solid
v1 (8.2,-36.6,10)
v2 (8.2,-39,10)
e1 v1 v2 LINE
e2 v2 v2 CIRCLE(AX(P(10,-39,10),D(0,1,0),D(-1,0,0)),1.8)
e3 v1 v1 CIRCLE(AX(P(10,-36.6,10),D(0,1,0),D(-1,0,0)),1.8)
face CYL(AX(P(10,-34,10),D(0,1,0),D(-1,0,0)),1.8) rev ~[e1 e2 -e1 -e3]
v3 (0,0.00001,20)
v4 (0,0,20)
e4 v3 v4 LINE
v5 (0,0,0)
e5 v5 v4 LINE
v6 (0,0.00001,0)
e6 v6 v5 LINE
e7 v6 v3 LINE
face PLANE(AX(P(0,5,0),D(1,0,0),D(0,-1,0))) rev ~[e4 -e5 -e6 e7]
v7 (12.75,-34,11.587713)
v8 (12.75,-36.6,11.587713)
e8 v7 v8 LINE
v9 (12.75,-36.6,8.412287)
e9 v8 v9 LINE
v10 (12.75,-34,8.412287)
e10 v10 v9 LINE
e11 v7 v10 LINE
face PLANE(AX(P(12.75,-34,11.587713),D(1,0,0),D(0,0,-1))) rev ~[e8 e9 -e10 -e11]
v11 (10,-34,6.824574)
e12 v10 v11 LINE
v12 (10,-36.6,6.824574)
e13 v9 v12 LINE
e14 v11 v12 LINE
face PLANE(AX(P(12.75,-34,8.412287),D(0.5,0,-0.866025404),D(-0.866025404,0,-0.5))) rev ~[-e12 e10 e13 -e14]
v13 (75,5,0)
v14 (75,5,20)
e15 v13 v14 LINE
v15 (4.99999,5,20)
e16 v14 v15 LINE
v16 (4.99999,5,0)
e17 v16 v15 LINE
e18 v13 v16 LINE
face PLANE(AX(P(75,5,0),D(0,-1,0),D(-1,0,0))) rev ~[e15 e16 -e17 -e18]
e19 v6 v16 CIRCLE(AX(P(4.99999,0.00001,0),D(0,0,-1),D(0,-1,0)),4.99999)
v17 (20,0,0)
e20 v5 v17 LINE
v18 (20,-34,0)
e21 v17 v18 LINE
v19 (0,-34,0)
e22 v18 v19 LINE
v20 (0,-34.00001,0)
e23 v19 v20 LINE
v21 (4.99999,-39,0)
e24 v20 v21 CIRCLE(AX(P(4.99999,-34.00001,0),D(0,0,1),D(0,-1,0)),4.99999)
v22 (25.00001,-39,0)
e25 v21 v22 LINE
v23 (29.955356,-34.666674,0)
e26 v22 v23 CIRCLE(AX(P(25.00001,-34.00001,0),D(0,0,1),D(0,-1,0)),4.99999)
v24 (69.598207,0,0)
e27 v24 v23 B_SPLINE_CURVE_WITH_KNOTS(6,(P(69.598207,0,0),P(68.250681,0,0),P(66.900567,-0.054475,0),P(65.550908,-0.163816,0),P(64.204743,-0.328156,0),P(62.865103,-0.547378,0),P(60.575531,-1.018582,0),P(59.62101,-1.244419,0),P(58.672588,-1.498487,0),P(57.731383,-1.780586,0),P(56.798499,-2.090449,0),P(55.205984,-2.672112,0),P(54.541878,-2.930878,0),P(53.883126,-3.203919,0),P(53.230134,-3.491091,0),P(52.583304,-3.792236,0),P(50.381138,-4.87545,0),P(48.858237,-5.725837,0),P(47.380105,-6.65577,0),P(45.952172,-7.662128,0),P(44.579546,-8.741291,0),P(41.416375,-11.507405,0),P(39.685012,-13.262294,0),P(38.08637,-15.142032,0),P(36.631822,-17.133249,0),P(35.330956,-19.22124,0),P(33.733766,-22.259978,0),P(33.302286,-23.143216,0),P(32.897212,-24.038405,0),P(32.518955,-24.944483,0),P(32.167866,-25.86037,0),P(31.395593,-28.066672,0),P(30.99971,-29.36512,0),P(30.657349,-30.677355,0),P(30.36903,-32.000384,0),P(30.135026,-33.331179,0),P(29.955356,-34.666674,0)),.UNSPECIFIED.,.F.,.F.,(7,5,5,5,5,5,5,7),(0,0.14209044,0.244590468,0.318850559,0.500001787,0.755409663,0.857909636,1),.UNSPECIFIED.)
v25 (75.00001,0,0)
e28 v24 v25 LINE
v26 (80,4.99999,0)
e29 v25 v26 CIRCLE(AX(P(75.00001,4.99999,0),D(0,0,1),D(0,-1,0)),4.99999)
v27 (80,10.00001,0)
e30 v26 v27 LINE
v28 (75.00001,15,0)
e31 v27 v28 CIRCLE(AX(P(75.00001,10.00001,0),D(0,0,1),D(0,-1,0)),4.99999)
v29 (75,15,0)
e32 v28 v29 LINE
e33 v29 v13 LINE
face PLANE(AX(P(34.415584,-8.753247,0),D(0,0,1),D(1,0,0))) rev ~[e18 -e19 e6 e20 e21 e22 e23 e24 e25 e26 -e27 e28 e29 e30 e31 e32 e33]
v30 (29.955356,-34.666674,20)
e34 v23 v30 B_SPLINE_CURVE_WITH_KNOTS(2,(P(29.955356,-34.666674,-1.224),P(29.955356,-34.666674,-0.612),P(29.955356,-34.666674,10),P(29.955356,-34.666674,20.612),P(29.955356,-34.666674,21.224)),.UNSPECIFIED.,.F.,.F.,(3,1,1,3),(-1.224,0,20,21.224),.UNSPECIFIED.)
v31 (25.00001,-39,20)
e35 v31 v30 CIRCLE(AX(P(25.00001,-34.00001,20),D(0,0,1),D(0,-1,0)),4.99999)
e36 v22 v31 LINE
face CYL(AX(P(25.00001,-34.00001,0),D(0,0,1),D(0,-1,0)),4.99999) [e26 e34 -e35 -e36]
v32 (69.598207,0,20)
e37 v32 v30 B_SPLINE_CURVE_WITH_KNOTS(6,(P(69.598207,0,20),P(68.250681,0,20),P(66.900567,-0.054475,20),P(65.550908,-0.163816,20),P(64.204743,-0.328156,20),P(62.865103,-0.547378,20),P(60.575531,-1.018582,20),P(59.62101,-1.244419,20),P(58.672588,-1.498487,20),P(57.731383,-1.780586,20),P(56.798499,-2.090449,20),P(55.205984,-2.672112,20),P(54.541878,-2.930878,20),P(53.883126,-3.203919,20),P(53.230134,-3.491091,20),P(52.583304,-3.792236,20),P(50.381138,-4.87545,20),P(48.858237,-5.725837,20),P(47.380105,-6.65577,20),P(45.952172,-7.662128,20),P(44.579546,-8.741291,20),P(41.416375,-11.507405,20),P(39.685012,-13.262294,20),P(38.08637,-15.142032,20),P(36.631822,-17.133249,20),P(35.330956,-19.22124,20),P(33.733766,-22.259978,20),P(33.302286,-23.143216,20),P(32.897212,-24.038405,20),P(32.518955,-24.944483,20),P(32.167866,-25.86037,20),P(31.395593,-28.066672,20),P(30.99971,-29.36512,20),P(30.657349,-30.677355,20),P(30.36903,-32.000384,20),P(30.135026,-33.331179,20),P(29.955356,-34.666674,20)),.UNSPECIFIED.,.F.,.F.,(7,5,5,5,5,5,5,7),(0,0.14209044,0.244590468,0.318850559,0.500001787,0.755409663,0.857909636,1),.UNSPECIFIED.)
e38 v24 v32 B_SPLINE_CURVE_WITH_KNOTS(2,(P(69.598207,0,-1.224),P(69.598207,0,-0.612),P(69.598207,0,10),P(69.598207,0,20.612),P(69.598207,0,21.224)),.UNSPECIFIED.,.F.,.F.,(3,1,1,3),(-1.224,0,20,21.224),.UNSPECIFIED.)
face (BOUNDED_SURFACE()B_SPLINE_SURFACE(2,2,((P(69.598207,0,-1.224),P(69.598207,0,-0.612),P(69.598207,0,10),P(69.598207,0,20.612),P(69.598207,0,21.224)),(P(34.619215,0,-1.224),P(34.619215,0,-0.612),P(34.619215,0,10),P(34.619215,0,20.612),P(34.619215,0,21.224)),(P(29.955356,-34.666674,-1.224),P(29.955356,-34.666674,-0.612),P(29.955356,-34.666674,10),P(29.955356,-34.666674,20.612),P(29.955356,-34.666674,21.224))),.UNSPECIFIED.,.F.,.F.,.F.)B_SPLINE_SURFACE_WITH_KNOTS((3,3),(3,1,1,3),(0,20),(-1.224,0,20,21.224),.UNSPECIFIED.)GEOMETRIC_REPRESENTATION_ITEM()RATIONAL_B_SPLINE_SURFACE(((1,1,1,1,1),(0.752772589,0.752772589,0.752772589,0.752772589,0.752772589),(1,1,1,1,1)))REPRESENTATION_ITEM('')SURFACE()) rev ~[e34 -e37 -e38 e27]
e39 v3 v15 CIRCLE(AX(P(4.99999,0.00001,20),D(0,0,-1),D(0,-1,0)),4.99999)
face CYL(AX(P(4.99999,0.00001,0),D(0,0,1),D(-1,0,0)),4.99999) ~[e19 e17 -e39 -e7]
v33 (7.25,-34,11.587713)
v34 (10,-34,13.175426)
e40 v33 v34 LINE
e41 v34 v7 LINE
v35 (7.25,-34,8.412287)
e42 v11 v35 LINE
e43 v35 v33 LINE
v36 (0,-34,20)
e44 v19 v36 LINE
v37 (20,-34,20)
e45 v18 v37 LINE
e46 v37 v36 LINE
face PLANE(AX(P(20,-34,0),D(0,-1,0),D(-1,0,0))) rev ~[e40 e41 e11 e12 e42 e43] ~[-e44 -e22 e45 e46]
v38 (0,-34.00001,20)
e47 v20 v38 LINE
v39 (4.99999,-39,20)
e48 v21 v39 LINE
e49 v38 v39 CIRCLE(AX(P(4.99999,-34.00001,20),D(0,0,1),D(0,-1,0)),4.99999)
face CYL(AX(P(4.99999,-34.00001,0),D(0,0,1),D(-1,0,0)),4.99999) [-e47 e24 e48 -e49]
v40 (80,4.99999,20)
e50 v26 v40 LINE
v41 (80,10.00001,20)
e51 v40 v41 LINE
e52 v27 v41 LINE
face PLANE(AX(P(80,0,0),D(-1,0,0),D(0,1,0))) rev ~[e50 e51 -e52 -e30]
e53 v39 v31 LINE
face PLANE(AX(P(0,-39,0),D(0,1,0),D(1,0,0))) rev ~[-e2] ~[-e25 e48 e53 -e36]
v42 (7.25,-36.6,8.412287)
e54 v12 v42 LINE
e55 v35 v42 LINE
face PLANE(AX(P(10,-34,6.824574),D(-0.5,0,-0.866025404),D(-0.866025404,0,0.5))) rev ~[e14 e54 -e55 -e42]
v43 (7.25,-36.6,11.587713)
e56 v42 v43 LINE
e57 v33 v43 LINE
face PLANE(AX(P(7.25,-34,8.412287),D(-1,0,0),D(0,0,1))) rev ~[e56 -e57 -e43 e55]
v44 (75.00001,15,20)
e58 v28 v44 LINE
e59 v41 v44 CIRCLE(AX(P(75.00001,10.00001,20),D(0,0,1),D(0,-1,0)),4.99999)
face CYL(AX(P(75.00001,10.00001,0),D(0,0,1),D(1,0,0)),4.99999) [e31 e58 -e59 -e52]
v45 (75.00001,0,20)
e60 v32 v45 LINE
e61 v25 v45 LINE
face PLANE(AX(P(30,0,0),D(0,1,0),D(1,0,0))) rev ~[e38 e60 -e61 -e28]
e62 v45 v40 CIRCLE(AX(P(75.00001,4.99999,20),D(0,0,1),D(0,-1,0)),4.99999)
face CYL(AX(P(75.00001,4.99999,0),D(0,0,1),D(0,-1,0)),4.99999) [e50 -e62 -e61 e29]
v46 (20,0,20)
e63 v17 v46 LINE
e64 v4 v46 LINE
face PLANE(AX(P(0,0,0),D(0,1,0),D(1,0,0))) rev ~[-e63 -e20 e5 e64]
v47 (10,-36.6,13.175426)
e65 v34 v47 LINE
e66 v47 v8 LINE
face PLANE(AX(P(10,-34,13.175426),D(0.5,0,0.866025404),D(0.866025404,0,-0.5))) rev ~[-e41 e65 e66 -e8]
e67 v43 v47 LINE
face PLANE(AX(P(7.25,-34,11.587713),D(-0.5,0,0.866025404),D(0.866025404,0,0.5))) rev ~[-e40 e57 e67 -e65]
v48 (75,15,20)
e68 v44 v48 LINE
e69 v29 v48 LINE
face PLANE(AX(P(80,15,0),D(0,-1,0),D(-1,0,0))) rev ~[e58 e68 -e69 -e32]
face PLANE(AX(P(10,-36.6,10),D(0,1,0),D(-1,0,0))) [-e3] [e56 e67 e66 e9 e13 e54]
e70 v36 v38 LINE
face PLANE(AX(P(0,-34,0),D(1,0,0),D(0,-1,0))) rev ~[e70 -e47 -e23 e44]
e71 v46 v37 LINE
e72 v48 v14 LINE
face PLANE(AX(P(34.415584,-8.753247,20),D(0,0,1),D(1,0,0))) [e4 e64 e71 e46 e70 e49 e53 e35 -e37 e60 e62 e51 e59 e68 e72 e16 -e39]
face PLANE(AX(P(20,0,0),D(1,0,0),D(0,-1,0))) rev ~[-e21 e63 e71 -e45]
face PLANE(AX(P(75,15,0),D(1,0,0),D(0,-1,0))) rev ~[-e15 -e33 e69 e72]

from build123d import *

# Parameters (mm, degrees)
F3_DEPTH = 20
F4_R     = 4.99999
F6_DEPTH = 2.6
F7_D     = 3.6
F7_DEPTH = 10
F7_TIP   = 1.0815491142
F8_R     = 40


# Not quite as in the source:
# - a fillet or chamfer is up to 0.001 mm smaller than in the source, because OpenCascade refuses the exact size


with BuildPart() as f3:
    # F2 (on Top) → F3 (new body)
    with BuildSketch(Plane.XY):
        Polygon((0, 5), (0, 0), (20, 0), (20, -34), (0, -34), (0, -39), (30, -39), (30, 0), (80, 0), (80, 15), (75, 15), (75, 5), align=None)
    extrude(amount=F3_DEPTH)

    # F4 (radius 5 in the source; OpenCascade refuses exactly that, so slightly less here)
    f4_edges = [f3.edges().sort_by_distance(p)[0] for p in [
        (30, -39, 10),
        (80, 0, 10),
        (80, 15, 10),
        (0, 5, 10),
        (0, -39, 10),
    ]]
    fillet(f4_edges, radius=F4_R)

    # F5 (on face) → F6 (cut)
    with BuildSketch(Plane(origin=(0, -34, 0), x_dir=(-1, 0, 0), z_dir=(0, 1, 0))):
        Polygon((-7.25, 8.4122867597), (-7.25, 11.5877132403), (-10, 13.1754264805), (-12.75, 11.5877132403), (-12.75, 8.4122867597), (-10, 6.8245735195), align=None)
    extrude(amount=-F6_DEPTH, mode=Mode.SUBTRACT)

    # F7 (one way)
    with BuildSketch(Plane(origin=(0, -34, 0), x_dir=(-1, 0, 0), z_dir=(0, 1, 0))):
        with Locations((-10, 10)):
            Circle(F7_D / 2)
    extrude(amount=-F7_DEPTH, mode=Mode.SUBTRACT)
    with Locations(Plane(origin=(0, -34, 0), x_dir=(-1, 0, 0), z_dir=(0, 1, 0))):
        with Locations((-10, 10)):
            with Locations((0, 0, -(F7_DEPTH + F7_TIP / 2))):  # 118° drill point
                Cone(0, F7_D / 2, F7_TIP, mode=Mode.SUBTRACT)

    # F8
    f8_edges = [f3.edges().sort_by_distance(p)[0] for p in [
        (30, 0, 10),
    ]]
    fillet(f8_edges, radius=F8_R)


solid = f3.part
